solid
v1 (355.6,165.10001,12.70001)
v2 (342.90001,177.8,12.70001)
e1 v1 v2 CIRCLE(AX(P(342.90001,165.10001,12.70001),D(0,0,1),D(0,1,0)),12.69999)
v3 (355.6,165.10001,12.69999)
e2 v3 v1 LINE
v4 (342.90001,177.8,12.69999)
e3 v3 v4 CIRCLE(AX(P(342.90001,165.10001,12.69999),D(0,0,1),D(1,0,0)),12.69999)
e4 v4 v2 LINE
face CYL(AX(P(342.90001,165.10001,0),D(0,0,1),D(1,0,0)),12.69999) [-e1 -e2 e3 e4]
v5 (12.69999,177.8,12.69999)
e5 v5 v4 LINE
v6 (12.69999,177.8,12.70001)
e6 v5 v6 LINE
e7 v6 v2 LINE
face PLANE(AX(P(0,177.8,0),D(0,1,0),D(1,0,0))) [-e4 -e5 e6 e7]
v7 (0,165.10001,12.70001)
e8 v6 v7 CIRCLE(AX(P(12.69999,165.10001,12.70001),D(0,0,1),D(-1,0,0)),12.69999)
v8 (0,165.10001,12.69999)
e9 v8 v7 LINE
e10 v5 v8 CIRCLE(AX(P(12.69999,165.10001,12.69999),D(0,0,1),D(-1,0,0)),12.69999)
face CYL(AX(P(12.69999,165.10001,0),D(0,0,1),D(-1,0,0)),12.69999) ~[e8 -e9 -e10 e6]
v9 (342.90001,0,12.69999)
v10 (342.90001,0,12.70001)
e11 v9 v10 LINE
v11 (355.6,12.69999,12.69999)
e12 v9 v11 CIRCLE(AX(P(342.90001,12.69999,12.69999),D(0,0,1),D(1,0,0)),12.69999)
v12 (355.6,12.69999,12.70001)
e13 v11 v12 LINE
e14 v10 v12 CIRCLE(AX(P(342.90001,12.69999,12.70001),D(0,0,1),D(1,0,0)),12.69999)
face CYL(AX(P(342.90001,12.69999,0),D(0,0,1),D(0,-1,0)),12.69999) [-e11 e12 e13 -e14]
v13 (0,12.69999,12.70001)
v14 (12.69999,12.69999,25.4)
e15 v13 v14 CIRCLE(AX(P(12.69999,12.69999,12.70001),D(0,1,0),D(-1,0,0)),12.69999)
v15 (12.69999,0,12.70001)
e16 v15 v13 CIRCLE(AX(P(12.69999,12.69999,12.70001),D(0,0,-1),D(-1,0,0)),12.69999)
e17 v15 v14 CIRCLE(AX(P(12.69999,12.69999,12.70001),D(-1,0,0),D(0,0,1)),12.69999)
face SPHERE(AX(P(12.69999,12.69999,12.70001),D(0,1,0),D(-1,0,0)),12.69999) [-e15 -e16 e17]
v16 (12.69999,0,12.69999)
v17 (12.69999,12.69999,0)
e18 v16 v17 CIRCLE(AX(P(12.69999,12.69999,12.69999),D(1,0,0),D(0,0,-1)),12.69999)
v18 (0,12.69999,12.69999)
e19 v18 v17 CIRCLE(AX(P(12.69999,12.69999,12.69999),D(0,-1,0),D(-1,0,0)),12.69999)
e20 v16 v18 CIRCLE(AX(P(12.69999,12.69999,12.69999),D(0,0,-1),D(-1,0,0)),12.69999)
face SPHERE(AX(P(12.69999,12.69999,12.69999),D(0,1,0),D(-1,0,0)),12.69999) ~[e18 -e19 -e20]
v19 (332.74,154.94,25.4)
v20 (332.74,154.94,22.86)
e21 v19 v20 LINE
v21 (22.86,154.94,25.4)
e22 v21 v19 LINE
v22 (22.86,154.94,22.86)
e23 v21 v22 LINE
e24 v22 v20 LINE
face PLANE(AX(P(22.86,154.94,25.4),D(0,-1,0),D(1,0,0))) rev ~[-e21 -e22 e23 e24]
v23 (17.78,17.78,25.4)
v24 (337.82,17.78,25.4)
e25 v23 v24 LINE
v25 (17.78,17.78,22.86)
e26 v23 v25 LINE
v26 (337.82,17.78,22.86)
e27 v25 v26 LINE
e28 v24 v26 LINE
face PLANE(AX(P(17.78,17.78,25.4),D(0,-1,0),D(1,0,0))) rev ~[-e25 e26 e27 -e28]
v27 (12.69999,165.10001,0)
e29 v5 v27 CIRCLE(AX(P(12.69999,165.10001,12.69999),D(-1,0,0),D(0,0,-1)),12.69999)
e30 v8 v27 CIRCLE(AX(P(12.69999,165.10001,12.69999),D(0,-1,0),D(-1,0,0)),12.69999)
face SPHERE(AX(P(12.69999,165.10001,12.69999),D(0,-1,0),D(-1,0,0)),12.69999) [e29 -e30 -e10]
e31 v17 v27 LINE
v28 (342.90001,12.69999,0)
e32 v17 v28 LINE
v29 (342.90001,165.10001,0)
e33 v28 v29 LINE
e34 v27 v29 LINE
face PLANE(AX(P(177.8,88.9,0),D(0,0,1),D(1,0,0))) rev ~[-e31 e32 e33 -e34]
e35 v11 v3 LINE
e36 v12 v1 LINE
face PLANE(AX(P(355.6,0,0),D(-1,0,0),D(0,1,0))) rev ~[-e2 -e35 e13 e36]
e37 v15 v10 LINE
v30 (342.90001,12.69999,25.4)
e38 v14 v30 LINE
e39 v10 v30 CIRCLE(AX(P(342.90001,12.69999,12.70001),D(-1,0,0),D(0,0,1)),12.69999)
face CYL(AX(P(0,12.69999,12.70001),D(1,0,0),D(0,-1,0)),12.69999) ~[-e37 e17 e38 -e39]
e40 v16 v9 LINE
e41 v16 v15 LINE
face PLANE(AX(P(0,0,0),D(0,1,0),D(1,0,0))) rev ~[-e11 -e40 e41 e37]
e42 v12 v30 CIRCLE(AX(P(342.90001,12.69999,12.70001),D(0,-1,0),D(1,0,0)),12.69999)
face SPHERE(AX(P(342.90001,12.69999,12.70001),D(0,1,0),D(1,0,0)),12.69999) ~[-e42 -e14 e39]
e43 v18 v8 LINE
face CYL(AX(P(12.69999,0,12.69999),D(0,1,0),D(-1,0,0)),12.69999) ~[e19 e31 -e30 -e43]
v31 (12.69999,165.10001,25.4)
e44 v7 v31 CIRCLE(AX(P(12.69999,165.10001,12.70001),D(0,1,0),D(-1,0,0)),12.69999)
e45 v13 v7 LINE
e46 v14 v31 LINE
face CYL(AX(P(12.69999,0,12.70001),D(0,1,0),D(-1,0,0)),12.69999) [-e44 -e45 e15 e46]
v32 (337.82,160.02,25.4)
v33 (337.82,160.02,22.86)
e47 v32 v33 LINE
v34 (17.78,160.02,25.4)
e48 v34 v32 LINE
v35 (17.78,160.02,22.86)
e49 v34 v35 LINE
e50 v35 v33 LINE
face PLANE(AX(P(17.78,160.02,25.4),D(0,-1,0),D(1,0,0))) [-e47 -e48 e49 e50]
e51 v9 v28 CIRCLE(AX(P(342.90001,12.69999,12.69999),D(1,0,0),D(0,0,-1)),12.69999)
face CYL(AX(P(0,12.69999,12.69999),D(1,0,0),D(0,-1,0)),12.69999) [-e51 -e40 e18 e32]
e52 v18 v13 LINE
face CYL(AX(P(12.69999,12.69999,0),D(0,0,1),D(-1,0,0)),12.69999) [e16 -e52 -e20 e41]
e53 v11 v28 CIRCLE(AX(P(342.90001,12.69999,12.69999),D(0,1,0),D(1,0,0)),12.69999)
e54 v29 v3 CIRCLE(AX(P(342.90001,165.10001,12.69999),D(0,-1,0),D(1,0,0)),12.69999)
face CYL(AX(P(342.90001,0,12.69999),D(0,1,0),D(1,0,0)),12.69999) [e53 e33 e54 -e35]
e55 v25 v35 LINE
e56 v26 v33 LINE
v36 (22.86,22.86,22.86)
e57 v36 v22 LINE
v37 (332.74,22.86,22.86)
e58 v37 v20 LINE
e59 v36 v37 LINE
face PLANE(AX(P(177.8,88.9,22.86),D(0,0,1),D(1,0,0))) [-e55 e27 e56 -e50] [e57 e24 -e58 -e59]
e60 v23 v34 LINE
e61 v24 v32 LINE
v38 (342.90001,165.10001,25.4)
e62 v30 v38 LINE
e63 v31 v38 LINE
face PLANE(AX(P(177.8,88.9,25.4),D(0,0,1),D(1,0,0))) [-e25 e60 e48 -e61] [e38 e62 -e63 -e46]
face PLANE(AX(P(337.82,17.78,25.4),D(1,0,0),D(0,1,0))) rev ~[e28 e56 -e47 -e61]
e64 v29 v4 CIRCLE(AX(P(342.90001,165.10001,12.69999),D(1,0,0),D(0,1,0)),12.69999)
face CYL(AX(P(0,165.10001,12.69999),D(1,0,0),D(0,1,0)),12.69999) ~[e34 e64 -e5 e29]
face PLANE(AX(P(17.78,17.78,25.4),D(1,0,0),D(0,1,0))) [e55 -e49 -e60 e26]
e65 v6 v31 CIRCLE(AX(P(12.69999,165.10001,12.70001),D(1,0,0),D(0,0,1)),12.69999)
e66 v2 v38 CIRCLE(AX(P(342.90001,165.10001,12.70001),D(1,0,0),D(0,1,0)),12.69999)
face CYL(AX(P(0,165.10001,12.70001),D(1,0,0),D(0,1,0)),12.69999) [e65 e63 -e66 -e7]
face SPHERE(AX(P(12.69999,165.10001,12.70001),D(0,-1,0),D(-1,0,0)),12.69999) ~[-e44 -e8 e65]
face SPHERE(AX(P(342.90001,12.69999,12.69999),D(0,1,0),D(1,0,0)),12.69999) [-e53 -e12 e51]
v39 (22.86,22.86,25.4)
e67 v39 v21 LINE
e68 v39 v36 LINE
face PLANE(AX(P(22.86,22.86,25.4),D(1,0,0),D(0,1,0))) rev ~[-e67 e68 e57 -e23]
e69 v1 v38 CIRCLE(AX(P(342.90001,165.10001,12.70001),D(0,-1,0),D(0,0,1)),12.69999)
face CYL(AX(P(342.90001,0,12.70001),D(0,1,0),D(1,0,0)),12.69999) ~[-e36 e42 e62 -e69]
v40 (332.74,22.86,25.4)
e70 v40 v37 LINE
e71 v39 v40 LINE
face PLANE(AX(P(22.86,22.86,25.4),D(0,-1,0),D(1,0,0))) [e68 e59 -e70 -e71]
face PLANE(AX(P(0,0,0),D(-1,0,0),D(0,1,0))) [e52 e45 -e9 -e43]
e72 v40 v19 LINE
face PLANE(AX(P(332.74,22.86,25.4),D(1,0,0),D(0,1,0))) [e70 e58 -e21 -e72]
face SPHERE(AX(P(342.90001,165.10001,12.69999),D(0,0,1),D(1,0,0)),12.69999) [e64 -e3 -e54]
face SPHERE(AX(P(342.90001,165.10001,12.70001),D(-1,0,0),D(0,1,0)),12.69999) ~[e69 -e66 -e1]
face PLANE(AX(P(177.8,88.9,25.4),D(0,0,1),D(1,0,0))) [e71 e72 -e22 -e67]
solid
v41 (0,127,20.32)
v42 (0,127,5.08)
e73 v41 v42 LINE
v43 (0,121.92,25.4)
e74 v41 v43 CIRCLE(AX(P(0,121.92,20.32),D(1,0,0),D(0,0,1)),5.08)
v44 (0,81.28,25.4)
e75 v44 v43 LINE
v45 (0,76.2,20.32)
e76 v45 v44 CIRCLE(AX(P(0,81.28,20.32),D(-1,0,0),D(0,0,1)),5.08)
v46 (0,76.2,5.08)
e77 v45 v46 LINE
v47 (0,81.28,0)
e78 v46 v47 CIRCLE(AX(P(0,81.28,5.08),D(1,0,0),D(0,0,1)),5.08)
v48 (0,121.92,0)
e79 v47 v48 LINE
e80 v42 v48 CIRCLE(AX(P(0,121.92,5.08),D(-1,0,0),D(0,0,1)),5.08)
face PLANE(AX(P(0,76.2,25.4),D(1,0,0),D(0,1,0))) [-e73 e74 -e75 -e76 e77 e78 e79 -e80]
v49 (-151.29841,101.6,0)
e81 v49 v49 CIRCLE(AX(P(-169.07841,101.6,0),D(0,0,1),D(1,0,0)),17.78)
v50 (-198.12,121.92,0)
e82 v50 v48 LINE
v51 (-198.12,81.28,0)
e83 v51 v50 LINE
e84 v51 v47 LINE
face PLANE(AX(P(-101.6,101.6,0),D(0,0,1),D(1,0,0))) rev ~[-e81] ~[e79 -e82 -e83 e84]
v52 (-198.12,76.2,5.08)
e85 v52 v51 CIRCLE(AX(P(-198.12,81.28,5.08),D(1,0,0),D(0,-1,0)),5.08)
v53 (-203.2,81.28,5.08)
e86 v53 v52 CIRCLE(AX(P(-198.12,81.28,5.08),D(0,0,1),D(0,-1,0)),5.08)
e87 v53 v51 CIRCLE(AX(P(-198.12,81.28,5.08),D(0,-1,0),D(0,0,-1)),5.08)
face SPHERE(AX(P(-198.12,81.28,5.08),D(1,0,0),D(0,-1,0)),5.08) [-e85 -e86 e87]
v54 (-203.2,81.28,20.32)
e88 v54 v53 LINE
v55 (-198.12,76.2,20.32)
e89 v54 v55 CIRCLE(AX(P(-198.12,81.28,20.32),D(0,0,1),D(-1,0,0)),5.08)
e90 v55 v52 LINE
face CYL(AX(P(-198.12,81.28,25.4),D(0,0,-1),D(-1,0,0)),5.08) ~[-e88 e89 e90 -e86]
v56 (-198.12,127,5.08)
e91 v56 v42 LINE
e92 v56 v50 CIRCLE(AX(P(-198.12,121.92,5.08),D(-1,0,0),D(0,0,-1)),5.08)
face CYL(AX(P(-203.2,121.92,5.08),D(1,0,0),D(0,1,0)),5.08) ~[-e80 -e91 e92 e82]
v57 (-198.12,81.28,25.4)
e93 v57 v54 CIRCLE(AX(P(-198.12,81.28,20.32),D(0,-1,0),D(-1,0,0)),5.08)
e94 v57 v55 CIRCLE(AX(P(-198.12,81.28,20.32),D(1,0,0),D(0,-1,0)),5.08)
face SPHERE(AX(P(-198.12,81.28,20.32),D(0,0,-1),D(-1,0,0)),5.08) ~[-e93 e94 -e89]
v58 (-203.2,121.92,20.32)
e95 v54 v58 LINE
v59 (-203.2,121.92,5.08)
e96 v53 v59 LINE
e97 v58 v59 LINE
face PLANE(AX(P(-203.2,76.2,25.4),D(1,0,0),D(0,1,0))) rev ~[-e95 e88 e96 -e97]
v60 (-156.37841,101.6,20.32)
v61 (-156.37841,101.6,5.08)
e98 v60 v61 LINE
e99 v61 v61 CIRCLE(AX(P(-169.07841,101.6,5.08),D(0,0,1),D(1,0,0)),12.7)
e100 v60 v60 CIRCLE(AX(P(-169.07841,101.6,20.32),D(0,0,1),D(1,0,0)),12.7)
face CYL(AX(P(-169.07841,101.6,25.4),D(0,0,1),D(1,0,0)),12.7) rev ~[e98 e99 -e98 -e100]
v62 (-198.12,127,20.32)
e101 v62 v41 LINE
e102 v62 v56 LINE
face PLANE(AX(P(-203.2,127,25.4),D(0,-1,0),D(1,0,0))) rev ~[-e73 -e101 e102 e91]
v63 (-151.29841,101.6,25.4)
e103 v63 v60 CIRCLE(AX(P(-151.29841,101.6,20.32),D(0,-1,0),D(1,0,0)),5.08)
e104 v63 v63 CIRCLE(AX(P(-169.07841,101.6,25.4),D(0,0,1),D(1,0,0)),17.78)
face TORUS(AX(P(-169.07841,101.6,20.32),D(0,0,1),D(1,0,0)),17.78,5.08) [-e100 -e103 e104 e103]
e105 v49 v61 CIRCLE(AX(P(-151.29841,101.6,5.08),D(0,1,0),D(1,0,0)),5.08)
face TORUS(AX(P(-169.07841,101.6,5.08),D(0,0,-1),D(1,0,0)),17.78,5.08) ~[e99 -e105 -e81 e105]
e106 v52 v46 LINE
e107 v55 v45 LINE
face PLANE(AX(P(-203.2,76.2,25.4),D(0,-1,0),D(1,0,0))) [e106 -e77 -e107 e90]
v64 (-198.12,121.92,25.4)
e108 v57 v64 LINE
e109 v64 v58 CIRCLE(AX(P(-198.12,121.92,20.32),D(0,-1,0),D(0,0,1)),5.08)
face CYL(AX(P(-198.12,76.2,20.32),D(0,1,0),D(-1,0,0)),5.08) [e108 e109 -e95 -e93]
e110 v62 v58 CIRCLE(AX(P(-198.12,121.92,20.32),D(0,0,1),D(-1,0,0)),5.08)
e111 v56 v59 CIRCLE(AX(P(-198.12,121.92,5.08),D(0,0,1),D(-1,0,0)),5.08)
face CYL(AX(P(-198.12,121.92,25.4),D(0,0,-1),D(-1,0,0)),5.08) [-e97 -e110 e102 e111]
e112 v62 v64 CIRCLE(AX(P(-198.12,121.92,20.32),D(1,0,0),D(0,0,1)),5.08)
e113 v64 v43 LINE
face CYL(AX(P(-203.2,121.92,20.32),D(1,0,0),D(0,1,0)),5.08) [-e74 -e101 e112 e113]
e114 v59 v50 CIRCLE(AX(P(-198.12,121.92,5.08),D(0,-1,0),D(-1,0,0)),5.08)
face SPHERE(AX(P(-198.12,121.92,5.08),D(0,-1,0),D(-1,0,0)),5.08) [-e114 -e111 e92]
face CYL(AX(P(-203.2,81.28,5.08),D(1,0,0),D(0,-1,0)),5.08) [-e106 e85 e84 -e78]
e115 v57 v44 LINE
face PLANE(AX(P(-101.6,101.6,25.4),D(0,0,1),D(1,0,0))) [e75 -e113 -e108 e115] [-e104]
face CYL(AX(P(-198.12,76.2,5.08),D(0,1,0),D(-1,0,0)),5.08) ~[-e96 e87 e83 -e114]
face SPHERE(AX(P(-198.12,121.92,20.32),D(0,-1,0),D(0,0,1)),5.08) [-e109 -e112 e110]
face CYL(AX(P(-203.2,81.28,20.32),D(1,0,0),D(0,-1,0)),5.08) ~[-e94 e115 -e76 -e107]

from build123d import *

# Parameters (mm, degrees)
F0_W     = 355.6
F0_H     = 177.8
F1_DEPTH = 25.4
F2_W     = 203.2
F2_H     = 50.8
F3_DEPTH = 25.4
F4_R     = 12.7
F5_DEPTH = 25.401
F6_R     = 5.08
F7_R     = 12.69999
F8_W     = 320.04
F8_H     = 142.24
F8_W_2   = 309.88
F8_H_2   = 132.08
F9_DEPTH = 2.54


# Not quite as in the source:
# - a fillet or chamfer is up to 0.001 mm smaller than in the source, because OpenCascade refuses the exact size


with BuildPart() as f1:
    # F0 (on Top) → F1 (new body)
    with BuildSketch(Plane.XY):
        with Locations((177.8, 88.9)):
            Rectangle(F0_W, F0_H)
    extrude(amount=F1_DEPTH)

    # F7 (radius 12.7 in the source; OpenCascade refuses exactly that, so slightly less here)
    f7_edges = [f1.edges().sort_by_distance(p)[0] for p in [
        (0, 88.9, 25.4),
        (0, 88.9, 0),
        (0, 177.8, 12.7),
        (177.8, 177.8, 25.4),
        (355.6, 177.8, 12.7),
        (355.6, 88.9, 0),
        (355.6, 88.9, 25.4),
        (0, 0, 12.7),
        (355.6, 0, 12.7),
        (177.8, 0, 0),
        (177.8, 0, 25.4),
        (177.8, 177.8, 0),
    ]]
    fillet(f7_edges, radius=F7_R)

    # F8 (on face) → F9 (cut)
    with BuildSketch(Plane.XY.offset(25.4)):
        with Locations((177.8, 88.9)):
            Rectangle(F8_W, F8_H)
        with Locations((177.8, 88.9)):
            Rectangle(F8_W_2, F8_H_2, mode=Mode.SUBTRACT)
    extrude(amount=-F9_DEPTH, mode=Mode.SUBTRACT)


with BuildPart() as f3:
    # F2 (on face) → F3 (new body)
    with BuildSketch(Plane.XY.offset(25.4)):
        with Locations((-101.6, 101.6)):
            Rectangle(F2_W, F2_H)
    extrude(amount=-F3_DEPTH)

    # F4 (on face) → F5 (cut, through all)
    with BuildSketch(Plane.XY.offset(25.4)):
        with Locations((-169.0784096718, 101.6)):
            Circle(F4_R)
    extrude(amount=-F5_DEPTH, mode=Mode.SUBTRACT)

    # F6
    f6_edges = [f3.edges().sort_by_distance(p)[0] for p in [
        (-181.77841, 101.6, 25.4),
        (-181.77841, 101.6, 0),
        (-101.6, 76.2, 0),
        (-203.2, 76.2, 12.7),
        (-203.2, 101.6, 0),
        (-203.2, 101.6, 25.4),
        (-101.6, 127, 25.4),
        (-203.2, 127, 12.7),
        (-101.6, 127, 0),
        (-101.6, 76.2, 25.4),
    ]]
    fillet(f6_edges, radius=F6_R)


solid = Compound([f1.part, f3.part])
